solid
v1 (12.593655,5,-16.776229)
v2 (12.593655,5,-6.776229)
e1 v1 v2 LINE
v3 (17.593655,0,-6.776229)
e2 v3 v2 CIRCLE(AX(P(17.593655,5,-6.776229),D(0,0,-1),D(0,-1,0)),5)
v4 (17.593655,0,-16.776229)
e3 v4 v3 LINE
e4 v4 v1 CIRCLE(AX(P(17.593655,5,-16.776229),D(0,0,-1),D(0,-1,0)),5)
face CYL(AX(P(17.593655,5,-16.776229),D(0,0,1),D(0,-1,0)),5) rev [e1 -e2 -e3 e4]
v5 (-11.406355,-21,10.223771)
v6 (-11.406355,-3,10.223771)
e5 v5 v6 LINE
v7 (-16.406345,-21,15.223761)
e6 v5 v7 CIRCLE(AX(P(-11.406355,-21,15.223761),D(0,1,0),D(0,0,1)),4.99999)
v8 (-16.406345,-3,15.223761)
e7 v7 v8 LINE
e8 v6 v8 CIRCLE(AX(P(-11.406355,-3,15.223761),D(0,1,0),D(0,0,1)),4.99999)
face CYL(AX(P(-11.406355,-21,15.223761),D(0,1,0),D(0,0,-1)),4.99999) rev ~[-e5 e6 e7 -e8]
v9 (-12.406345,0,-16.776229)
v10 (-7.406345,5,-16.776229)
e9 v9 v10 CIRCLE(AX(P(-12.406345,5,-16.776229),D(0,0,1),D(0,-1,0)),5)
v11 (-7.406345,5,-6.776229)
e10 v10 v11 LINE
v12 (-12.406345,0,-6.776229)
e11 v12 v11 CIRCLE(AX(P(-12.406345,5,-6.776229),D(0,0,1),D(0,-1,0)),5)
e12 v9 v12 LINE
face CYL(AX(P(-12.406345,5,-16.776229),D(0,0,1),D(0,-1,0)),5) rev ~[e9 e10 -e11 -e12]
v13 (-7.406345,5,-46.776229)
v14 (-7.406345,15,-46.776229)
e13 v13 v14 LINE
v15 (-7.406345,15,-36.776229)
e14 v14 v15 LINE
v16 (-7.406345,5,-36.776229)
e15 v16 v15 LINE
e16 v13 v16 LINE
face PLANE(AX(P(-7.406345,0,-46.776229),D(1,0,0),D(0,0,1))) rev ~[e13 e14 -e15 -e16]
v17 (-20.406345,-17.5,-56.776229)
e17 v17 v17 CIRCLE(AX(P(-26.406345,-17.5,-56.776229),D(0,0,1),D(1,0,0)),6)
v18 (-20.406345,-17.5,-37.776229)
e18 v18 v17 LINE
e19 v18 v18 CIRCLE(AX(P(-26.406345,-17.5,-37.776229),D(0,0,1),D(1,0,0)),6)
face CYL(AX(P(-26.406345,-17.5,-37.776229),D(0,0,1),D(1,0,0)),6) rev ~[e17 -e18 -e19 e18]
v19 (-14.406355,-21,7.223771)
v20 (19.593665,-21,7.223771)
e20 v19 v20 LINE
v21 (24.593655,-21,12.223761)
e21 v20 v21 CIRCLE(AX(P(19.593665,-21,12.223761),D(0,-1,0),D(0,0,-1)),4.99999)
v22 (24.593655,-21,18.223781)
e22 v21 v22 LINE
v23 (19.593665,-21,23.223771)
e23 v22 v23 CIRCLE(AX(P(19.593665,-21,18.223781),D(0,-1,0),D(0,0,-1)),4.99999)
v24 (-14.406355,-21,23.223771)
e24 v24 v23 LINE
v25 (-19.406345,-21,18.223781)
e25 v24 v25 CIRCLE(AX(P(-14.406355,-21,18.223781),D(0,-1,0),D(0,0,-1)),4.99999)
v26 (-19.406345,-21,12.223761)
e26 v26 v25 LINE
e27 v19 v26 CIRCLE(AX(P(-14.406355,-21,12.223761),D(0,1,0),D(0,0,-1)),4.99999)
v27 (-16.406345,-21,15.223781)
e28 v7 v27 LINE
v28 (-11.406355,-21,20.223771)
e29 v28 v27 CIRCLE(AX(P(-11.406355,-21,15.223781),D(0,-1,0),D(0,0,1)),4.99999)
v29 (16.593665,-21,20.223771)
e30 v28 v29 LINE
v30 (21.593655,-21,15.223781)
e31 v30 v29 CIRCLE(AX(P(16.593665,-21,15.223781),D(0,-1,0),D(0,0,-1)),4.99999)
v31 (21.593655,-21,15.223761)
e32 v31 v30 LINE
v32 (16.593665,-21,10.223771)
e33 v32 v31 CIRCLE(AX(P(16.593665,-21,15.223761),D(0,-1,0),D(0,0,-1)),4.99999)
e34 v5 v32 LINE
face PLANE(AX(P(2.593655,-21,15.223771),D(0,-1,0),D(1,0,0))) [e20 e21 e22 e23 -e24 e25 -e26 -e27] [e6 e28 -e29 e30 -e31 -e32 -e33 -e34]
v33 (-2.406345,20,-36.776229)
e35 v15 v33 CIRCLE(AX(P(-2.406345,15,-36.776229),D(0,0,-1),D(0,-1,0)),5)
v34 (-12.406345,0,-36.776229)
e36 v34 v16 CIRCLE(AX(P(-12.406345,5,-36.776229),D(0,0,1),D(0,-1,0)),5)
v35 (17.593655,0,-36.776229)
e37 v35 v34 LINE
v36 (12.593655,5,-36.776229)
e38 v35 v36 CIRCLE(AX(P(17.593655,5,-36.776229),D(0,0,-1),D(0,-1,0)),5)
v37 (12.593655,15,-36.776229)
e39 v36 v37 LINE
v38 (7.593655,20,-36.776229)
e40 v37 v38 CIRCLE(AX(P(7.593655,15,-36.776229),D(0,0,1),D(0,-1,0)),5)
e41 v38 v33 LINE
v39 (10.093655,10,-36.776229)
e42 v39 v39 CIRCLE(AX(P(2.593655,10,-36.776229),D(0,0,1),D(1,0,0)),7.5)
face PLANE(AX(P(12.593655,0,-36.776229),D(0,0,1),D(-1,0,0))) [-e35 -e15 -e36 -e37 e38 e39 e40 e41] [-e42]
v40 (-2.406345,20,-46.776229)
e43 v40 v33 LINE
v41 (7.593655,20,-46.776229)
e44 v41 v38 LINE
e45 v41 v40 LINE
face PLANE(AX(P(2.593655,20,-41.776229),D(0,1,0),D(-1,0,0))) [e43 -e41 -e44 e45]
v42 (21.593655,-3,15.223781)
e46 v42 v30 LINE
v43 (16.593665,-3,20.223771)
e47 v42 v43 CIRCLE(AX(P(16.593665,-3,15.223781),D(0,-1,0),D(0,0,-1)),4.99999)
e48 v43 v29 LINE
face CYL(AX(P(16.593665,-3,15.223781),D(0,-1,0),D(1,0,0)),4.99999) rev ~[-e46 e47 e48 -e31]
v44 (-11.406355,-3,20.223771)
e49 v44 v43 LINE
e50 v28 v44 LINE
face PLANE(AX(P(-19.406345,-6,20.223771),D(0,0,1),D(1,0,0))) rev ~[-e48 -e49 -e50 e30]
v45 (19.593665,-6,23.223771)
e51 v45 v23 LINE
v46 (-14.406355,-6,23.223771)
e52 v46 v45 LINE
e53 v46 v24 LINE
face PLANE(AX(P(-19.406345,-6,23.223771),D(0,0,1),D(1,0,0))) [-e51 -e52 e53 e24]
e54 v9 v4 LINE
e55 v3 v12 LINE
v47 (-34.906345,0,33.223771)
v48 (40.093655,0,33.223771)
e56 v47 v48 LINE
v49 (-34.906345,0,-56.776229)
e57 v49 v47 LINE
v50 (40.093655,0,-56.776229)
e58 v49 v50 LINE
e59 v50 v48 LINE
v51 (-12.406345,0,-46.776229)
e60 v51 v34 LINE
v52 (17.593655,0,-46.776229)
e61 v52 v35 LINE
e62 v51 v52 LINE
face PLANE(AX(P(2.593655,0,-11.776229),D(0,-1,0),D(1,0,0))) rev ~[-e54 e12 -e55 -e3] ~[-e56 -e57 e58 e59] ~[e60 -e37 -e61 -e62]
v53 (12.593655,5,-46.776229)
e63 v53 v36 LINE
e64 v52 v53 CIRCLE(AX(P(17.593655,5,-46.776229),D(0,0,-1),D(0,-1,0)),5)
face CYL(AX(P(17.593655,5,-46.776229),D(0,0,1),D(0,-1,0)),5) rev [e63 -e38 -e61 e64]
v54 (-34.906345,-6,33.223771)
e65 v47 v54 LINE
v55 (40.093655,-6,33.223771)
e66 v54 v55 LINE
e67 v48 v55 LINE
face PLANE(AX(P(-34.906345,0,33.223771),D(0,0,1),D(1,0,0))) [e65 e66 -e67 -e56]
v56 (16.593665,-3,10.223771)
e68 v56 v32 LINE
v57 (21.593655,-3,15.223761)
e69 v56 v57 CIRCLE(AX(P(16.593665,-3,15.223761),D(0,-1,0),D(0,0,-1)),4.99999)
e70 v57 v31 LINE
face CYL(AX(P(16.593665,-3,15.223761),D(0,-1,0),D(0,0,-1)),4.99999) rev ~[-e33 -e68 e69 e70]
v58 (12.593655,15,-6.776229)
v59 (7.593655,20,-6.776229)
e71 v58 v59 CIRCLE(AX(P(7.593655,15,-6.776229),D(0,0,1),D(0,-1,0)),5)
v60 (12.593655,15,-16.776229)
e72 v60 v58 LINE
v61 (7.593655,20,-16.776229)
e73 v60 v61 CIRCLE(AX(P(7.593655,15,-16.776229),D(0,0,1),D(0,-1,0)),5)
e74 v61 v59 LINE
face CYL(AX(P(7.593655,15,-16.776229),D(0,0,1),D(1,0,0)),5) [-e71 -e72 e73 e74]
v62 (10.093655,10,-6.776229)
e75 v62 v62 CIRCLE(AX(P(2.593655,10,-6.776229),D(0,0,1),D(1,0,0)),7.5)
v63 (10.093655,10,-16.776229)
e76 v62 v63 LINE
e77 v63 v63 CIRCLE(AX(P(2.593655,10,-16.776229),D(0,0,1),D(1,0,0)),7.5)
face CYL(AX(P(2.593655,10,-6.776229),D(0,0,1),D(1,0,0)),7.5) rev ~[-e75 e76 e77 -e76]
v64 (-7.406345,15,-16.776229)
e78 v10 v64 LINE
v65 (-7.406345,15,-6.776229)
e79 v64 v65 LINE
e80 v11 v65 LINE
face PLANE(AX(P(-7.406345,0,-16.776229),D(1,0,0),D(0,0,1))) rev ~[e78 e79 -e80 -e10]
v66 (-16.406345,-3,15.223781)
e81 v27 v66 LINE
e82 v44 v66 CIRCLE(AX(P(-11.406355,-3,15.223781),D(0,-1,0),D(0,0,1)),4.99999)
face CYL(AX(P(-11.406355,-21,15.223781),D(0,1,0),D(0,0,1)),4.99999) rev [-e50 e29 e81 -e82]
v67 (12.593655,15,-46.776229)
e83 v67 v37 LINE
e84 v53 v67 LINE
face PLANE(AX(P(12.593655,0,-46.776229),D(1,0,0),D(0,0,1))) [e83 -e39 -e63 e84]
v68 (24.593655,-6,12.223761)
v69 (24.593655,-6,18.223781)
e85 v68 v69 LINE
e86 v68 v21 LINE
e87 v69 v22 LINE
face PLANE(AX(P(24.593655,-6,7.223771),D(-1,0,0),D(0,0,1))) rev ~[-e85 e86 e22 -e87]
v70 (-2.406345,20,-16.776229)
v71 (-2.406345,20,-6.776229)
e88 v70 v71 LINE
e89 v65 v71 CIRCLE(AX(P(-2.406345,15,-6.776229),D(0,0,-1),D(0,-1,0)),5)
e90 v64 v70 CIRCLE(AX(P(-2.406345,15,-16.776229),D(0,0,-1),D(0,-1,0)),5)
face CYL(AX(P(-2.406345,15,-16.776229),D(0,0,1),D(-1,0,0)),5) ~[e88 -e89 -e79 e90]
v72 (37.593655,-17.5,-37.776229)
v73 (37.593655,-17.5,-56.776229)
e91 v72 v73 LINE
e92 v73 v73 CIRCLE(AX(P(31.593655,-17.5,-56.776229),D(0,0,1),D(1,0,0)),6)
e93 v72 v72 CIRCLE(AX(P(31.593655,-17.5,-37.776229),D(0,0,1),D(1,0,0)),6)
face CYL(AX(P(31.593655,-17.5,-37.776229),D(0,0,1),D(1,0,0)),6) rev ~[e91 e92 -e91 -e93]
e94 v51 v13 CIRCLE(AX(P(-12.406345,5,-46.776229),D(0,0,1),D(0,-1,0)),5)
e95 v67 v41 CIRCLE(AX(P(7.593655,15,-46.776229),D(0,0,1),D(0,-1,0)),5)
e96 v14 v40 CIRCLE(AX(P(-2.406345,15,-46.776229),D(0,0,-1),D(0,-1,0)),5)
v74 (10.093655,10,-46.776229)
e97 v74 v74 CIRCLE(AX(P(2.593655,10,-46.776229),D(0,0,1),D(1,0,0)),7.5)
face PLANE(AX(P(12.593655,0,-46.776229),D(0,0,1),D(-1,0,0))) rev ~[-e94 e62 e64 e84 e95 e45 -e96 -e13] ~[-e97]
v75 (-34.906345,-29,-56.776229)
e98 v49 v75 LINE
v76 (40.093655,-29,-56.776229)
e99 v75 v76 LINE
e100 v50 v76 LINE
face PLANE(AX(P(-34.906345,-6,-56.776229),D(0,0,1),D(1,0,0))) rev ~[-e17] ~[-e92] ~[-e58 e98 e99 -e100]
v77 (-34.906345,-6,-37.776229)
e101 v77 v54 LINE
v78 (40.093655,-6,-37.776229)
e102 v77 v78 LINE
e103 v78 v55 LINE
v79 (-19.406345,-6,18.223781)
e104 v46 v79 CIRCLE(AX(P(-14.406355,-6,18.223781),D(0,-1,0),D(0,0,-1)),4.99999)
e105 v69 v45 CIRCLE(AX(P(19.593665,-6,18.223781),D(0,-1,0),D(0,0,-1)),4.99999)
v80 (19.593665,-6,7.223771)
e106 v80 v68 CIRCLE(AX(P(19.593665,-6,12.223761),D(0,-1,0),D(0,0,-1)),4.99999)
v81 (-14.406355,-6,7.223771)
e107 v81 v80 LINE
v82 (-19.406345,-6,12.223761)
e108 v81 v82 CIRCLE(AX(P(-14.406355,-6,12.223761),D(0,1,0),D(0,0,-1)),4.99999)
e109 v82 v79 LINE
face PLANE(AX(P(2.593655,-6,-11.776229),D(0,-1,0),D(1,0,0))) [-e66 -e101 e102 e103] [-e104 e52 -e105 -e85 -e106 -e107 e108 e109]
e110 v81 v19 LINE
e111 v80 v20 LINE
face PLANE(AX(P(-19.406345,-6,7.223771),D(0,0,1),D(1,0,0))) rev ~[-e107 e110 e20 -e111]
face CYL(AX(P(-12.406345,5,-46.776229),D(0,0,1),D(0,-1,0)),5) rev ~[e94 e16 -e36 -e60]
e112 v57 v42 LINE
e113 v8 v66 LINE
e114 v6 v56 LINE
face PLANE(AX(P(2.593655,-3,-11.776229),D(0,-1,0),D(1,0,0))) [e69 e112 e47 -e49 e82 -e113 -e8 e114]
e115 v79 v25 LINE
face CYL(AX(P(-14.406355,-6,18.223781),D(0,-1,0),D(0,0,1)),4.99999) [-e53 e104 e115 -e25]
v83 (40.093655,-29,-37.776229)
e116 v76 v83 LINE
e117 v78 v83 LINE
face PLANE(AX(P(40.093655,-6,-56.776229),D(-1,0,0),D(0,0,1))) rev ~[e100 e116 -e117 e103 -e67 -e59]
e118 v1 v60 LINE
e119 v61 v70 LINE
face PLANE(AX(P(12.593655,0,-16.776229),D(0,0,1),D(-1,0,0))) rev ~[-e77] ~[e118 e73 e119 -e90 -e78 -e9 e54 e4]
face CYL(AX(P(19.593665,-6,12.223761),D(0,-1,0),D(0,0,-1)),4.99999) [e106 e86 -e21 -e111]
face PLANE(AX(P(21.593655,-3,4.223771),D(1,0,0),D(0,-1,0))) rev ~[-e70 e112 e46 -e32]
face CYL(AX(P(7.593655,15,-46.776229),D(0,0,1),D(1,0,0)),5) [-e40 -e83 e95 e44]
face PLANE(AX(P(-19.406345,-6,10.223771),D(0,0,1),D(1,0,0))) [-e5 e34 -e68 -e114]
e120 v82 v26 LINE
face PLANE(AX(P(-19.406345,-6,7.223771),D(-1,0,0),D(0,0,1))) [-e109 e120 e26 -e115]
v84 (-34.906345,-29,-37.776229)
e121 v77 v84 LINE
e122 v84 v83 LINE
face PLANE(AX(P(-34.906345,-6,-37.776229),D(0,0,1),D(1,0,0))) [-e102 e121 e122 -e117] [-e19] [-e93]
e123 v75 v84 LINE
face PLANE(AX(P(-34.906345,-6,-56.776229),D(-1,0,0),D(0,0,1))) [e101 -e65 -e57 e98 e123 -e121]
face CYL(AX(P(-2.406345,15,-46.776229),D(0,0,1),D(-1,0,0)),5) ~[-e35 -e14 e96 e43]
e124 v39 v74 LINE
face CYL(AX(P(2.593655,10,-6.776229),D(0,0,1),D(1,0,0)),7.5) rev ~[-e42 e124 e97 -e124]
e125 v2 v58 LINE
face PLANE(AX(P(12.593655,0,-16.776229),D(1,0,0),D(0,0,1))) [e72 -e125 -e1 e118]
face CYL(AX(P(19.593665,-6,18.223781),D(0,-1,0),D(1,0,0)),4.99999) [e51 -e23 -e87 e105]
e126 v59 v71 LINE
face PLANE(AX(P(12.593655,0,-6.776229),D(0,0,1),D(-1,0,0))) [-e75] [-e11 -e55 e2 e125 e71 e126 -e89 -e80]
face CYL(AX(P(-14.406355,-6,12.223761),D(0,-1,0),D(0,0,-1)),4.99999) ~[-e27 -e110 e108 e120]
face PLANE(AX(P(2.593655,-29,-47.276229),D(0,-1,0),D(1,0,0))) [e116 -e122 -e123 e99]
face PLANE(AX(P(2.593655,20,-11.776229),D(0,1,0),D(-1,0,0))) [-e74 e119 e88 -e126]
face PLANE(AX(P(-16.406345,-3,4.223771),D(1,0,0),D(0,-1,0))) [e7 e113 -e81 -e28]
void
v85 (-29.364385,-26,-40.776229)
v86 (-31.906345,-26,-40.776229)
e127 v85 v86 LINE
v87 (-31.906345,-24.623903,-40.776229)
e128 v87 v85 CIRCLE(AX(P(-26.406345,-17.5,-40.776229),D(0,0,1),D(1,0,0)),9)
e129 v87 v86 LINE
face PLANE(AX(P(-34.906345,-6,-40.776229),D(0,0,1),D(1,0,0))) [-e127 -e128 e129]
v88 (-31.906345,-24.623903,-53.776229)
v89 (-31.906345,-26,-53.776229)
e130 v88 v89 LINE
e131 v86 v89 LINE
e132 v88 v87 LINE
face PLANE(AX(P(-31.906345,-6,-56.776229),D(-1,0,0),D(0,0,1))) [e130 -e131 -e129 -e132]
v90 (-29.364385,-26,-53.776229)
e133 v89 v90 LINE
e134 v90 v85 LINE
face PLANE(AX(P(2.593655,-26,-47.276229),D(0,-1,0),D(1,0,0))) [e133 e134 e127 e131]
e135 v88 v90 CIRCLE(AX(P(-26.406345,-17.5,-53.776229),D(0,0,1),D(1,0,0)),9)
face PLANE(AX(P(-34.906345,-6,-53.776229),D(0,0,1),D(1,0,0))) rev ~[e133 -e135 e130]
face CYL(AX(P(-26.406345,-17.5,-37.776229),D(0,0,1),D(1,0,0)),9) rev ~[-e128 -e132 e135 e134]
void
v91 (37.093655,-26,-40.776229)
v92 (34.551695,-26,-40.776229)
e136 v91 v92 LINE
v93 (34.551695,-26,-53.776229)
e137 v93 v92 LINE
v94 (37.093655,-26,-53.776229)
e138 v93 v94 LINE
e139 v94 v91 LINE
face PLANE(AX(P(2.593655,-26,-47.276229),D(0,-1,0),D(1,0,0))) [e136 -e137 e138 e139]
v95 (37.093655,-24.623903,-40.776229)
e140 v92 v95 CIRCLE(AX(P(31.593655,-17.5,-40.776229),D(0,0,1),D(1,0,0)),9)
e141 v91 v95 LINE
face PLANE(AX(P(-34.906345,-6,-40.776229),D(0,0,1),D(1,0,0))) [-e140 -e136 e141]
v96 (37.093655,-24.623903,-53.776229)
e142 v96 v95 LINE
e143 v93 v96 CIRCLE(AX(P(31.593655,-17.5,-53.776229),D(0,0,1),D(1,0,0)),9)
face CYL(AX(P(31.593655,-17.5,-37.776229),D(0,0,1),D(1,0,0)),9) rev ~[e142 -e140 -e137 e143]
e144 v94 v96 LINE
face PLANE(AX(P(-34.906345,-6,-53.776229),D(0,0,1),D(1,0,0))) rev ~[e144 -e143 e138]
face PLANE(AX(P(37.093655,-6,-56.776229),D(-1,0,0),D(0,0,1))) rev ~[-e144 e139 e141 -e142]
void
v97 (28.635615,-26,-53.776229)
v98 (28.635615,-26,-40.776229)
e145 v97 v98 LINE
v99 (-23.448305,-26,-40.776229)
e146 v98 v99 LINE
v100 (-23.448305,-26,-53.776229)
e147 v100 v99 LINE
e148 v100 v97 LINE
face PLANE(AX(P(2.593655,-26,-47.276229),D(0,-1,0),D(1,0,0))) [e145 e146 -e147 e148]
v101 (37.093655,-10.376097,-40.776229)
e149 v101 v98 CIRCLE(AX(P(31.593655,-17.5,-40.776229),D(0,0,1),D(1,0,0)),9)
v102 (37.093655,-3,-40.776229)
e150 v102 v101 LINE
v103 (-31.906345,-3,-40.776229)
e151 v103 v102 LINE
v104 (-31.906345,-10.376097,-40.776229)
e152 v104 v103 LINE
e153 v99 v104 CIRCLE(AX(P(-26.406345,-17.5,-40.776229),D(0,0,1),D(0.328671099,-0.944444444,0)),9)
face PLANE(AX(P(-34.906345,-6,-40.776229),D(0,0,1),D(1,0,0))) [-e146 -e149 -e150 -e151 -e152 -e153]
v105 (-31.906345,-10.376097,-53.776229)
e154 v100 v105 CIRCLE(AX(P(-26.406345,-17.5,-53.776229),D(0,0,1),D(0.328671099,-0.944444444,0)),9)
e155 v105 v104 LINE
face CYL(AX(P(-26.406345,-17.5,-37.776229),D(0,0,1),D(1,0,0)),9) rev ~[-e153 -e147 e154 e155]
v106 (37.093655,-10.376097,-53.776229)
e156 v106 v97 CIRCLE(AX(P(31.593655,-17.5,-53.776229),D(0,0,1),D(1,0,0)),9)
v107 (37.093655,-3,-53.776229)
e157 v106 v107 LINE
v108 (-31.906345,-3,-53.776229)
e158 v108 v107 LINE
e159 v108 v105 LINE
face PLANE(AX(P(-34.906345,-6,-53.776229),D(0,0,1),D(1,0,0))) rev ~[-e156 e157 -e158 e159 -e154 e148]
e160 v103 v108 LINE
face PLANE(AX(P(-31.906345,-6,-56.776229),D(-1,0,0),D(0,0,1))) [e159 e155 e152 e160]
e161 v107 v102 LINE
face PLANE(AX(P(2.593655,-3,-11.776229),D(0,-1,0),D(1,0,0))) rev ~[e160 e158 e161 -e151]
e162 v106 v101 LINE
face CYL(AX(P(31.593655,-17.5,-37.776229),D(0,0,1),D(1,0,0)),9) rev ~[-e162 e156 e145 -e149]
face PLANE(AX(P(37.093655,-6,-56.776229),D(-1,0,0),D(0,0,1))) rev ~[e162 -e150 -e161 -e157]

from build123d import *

# Parameters (mm, degrees)
F1_W        = 75
F1_H        = 90
F2_DEPTH    = 6
F3_W        = 75
F3_H        = 19
F4_DEPTH    = 23
F5_R        = 6
F6_DEPTH    = 19
F7_W        = 44
F7_H        = 16
F8_DEPTH    = 15
F9_T        = 3
F9_T3_DEPTH = 81
F9_T5_DEPTH = 22
F9_T7_DEPTH = 50
F10_R       = 4.99999
F11_W       = 20
F11_H       = 10
F12_DEPTH   = 20
F13_R       = 7.5
F14_DEPTH   = 40
F15_R       = 5


# Not quite as in the source:
# - a fillet or chamfer is up to 0.001 mm smaller than in the source, because OpenCascade refuses the exact size
# - a shell that OpenCascade refuses in one call is made with other operations: the cavity is built on its own and cut out


with BuildPart() as f2:
    # F1 (on Front) → F2 (new body)
    with BuildSketch(Plane.XZ):
        with Locations((2.5936549902, -11.7762294412)):
            Rectangle(F1_W, F1_H)
    extrude(amount=F2_DEPTH)

    # F3 (on face) → F4 (join)
    with BuildSketch(Plane.XZ.offset(6)):
        with Locations((2.5936549902, -47.2762294412)):
            Rectangle(F3_W, F3_H)
    extrude(amount=F4_DEPTH)

    # F5 (on face) → F6 (cut, through all)
    with BuildSketch(Plane.XY.offset(-37.7762294412)):
        with Locations((-26.4063450098, -17.5)):
            Circle(F5_R)
        with Locations((31.5936549902, -17.5)):
            Circle(F5_R)
    extrude(amount=-F6_DEPTH, mode=Mode.SUBTRACT)

    # F7 (on face) → F8 (join)
    with BuildSketch(Plane.XZ.offset(6)):
        with Locations((2.5936549902, 15.2237705588)):
            Rectangle(F7_W, F7_H)
    extrude(amount=F8_DEPTH)

    # F9: shell of thickness 3, made by hand


with BuildPart() as f9_core1:
    # F9_t2: copy of F2
    add(f2.part)

    # the walls: a layer under each face that stays
    f9_faces = [f9_core1.faces().sort_by_distance(p)[0] for p in [
        (40.0936549902, -24.1666666667, -41.7762294412),
        (2.5936549902, -14.5, -56.7762294412),
        (2.5936549902, -29, -47.2762294412),
        (2.5936549902, -17.5, -37.7762294412),
        (2.5936549902, -6, -2.2762294412),
        (2.5936549902, -3, 33.2237705588),
        (2.5936549902, 0, -11.7762294412),
        (-34.9063450098, -4.8333333333, 18.2237705588),
        (-32.4063450098, -17.5, -47.2762294412),
        (25.5936549902, -17.5, -47.2762294412),
        (24.5936549902, -13.5, 15.2237705588),
        (2.5936549902, -13.5, 23.2237705588),
        (-19.4063450098, -13.5, 15.2237705588),
        (2.5936549902, -13.5, 7.2237705588),
    ]]
    thicken(f9_faces, amount=-F9_T, mode=Mode.SUBTRACT)

    # F9_s4 → F9_t3 (cut)
    with BuildSketch(Plane.YZ.offset(-37.9063450098)):
        Polygon((-6.03, -37.7462294412), (-6, -40.7762294412), (-3, -40.7762294412), (-3, -37.7762294412), align=None)
    extrude(amount=F9_T3_DEPTH, mode=Mode.SUBTRACT)

    # F9_s6 → F9_t5 (cut)
    with BuildSketch(Plane.XY.offset(4.2237705588)):
        Polygon((24.6236549902, -6.03), (24.5936549902, -3), (21.5936549902, -3), (21.5936549902, -6), align=None)
        Polygon((-19.4363450098, -6.03), (-19.4063450098, -3), (-16.4063450098, -3), (-16.4063450098, -6), align=None)
    extrude(amount=F9_T5_DEPTH, mode=Mode.SUBTRACT)

    # F9_s8 → F9_t7 (cut)
    with BuildSketch(Plane.YZ.offset(-22.4063450098)):
        Polygon((-6.03, 23.2537705588), (-3, 23.2237705588), (-3, 20.2237705588), (-6, 20.2237705588), align=None)
        Polygon((-6.03, 7.1937705588), (-3, 7.2237705588), (-3, 10.2237705588), (-6, 10.2237705588), align=None)
    extrude(amount=F9_T7_DEPTH, mode=Mode.SUBTRACT)


with BuildPart() as f2_1:
    add(f2.part)

    # what is left inside the walls is the cavity
    f9_cavity = [f9_core1.part.solids().sort_by_distance(p)[0] for p in [
        (35.892563, -25.441051, -49.442896),
        (-30.705253, -25.441051, -49.442896),
        (2.593655, -18.333333, -40.806229),
        (2.593655, -15, 10.253771),
    ]]
    add(f9_cavity, mode=Mode.SUBTRACT)

    # F10 (radius 5 in the source; OpenCascade refuses exactly that, so slightly less here)
    f10_edges = [f2_1.edges().sort_by_distance(p)[0] for p in [
        (-19.406345, -13.5, 23.223771),
        (-16.406345, -13.5, 20.223771),
        (-16.406345, -13.5, 10.223771),
        (-19.406345, -13.5, 7.223771),
        (21.593655, -13.5, 20.223771),
        (21.593655, -13.5, 10.223771),
        (24.593655, -13.5, 7.223771),
        (24.593655, -13.5, 23.223771),
    ]]
    fillet(f10_edges, radius=F10_R)

    # F11 (on face) → F12 (join)
    with BuildSketch(Plane(origin=(0, 0, 0), x_dir=(-1, 0, 0), z_dir=(0, 1, 0))):
        with Locations((-2.5936549902, -11.7762294412)):
            Rectangle(F11_W, F11_H)
        with Locations((-2.5936549902, -41.7762294412)):
            Rectangle(F11_W, F11_H)
    extrude(amount=F12_DEPTH)

    # F13 (on face) → F14 (cut, through all)
    with BuildSketch(Plane.XY.offset(-6.7762294412)):
        with Locations((2.5936549902, 10)):
            Circle(F13_R)
    extrude(amount=-F14_DEPTH, mode=Mode.SUBTRACT)

    # F15
    f15_edges = [f2_1.edges().sort_by_distance(p)[0] for p in [
        (12.593655, 20, -11.776229),
        (-7.406345, 20, -11.776229),
        (-7.406345, 0, -11.776229),
        (12.593655, 0, -11.776229),
        (12.593655, 0, -41.776229),
        (12.593655, 20, -41.776229),
        (-7.406345, 0, -41.776229),
        (-7.406345, 20, -41.776229),
    ]]
    fillet(f15_edges, radius=F15_R)


solid = f2_1.part
